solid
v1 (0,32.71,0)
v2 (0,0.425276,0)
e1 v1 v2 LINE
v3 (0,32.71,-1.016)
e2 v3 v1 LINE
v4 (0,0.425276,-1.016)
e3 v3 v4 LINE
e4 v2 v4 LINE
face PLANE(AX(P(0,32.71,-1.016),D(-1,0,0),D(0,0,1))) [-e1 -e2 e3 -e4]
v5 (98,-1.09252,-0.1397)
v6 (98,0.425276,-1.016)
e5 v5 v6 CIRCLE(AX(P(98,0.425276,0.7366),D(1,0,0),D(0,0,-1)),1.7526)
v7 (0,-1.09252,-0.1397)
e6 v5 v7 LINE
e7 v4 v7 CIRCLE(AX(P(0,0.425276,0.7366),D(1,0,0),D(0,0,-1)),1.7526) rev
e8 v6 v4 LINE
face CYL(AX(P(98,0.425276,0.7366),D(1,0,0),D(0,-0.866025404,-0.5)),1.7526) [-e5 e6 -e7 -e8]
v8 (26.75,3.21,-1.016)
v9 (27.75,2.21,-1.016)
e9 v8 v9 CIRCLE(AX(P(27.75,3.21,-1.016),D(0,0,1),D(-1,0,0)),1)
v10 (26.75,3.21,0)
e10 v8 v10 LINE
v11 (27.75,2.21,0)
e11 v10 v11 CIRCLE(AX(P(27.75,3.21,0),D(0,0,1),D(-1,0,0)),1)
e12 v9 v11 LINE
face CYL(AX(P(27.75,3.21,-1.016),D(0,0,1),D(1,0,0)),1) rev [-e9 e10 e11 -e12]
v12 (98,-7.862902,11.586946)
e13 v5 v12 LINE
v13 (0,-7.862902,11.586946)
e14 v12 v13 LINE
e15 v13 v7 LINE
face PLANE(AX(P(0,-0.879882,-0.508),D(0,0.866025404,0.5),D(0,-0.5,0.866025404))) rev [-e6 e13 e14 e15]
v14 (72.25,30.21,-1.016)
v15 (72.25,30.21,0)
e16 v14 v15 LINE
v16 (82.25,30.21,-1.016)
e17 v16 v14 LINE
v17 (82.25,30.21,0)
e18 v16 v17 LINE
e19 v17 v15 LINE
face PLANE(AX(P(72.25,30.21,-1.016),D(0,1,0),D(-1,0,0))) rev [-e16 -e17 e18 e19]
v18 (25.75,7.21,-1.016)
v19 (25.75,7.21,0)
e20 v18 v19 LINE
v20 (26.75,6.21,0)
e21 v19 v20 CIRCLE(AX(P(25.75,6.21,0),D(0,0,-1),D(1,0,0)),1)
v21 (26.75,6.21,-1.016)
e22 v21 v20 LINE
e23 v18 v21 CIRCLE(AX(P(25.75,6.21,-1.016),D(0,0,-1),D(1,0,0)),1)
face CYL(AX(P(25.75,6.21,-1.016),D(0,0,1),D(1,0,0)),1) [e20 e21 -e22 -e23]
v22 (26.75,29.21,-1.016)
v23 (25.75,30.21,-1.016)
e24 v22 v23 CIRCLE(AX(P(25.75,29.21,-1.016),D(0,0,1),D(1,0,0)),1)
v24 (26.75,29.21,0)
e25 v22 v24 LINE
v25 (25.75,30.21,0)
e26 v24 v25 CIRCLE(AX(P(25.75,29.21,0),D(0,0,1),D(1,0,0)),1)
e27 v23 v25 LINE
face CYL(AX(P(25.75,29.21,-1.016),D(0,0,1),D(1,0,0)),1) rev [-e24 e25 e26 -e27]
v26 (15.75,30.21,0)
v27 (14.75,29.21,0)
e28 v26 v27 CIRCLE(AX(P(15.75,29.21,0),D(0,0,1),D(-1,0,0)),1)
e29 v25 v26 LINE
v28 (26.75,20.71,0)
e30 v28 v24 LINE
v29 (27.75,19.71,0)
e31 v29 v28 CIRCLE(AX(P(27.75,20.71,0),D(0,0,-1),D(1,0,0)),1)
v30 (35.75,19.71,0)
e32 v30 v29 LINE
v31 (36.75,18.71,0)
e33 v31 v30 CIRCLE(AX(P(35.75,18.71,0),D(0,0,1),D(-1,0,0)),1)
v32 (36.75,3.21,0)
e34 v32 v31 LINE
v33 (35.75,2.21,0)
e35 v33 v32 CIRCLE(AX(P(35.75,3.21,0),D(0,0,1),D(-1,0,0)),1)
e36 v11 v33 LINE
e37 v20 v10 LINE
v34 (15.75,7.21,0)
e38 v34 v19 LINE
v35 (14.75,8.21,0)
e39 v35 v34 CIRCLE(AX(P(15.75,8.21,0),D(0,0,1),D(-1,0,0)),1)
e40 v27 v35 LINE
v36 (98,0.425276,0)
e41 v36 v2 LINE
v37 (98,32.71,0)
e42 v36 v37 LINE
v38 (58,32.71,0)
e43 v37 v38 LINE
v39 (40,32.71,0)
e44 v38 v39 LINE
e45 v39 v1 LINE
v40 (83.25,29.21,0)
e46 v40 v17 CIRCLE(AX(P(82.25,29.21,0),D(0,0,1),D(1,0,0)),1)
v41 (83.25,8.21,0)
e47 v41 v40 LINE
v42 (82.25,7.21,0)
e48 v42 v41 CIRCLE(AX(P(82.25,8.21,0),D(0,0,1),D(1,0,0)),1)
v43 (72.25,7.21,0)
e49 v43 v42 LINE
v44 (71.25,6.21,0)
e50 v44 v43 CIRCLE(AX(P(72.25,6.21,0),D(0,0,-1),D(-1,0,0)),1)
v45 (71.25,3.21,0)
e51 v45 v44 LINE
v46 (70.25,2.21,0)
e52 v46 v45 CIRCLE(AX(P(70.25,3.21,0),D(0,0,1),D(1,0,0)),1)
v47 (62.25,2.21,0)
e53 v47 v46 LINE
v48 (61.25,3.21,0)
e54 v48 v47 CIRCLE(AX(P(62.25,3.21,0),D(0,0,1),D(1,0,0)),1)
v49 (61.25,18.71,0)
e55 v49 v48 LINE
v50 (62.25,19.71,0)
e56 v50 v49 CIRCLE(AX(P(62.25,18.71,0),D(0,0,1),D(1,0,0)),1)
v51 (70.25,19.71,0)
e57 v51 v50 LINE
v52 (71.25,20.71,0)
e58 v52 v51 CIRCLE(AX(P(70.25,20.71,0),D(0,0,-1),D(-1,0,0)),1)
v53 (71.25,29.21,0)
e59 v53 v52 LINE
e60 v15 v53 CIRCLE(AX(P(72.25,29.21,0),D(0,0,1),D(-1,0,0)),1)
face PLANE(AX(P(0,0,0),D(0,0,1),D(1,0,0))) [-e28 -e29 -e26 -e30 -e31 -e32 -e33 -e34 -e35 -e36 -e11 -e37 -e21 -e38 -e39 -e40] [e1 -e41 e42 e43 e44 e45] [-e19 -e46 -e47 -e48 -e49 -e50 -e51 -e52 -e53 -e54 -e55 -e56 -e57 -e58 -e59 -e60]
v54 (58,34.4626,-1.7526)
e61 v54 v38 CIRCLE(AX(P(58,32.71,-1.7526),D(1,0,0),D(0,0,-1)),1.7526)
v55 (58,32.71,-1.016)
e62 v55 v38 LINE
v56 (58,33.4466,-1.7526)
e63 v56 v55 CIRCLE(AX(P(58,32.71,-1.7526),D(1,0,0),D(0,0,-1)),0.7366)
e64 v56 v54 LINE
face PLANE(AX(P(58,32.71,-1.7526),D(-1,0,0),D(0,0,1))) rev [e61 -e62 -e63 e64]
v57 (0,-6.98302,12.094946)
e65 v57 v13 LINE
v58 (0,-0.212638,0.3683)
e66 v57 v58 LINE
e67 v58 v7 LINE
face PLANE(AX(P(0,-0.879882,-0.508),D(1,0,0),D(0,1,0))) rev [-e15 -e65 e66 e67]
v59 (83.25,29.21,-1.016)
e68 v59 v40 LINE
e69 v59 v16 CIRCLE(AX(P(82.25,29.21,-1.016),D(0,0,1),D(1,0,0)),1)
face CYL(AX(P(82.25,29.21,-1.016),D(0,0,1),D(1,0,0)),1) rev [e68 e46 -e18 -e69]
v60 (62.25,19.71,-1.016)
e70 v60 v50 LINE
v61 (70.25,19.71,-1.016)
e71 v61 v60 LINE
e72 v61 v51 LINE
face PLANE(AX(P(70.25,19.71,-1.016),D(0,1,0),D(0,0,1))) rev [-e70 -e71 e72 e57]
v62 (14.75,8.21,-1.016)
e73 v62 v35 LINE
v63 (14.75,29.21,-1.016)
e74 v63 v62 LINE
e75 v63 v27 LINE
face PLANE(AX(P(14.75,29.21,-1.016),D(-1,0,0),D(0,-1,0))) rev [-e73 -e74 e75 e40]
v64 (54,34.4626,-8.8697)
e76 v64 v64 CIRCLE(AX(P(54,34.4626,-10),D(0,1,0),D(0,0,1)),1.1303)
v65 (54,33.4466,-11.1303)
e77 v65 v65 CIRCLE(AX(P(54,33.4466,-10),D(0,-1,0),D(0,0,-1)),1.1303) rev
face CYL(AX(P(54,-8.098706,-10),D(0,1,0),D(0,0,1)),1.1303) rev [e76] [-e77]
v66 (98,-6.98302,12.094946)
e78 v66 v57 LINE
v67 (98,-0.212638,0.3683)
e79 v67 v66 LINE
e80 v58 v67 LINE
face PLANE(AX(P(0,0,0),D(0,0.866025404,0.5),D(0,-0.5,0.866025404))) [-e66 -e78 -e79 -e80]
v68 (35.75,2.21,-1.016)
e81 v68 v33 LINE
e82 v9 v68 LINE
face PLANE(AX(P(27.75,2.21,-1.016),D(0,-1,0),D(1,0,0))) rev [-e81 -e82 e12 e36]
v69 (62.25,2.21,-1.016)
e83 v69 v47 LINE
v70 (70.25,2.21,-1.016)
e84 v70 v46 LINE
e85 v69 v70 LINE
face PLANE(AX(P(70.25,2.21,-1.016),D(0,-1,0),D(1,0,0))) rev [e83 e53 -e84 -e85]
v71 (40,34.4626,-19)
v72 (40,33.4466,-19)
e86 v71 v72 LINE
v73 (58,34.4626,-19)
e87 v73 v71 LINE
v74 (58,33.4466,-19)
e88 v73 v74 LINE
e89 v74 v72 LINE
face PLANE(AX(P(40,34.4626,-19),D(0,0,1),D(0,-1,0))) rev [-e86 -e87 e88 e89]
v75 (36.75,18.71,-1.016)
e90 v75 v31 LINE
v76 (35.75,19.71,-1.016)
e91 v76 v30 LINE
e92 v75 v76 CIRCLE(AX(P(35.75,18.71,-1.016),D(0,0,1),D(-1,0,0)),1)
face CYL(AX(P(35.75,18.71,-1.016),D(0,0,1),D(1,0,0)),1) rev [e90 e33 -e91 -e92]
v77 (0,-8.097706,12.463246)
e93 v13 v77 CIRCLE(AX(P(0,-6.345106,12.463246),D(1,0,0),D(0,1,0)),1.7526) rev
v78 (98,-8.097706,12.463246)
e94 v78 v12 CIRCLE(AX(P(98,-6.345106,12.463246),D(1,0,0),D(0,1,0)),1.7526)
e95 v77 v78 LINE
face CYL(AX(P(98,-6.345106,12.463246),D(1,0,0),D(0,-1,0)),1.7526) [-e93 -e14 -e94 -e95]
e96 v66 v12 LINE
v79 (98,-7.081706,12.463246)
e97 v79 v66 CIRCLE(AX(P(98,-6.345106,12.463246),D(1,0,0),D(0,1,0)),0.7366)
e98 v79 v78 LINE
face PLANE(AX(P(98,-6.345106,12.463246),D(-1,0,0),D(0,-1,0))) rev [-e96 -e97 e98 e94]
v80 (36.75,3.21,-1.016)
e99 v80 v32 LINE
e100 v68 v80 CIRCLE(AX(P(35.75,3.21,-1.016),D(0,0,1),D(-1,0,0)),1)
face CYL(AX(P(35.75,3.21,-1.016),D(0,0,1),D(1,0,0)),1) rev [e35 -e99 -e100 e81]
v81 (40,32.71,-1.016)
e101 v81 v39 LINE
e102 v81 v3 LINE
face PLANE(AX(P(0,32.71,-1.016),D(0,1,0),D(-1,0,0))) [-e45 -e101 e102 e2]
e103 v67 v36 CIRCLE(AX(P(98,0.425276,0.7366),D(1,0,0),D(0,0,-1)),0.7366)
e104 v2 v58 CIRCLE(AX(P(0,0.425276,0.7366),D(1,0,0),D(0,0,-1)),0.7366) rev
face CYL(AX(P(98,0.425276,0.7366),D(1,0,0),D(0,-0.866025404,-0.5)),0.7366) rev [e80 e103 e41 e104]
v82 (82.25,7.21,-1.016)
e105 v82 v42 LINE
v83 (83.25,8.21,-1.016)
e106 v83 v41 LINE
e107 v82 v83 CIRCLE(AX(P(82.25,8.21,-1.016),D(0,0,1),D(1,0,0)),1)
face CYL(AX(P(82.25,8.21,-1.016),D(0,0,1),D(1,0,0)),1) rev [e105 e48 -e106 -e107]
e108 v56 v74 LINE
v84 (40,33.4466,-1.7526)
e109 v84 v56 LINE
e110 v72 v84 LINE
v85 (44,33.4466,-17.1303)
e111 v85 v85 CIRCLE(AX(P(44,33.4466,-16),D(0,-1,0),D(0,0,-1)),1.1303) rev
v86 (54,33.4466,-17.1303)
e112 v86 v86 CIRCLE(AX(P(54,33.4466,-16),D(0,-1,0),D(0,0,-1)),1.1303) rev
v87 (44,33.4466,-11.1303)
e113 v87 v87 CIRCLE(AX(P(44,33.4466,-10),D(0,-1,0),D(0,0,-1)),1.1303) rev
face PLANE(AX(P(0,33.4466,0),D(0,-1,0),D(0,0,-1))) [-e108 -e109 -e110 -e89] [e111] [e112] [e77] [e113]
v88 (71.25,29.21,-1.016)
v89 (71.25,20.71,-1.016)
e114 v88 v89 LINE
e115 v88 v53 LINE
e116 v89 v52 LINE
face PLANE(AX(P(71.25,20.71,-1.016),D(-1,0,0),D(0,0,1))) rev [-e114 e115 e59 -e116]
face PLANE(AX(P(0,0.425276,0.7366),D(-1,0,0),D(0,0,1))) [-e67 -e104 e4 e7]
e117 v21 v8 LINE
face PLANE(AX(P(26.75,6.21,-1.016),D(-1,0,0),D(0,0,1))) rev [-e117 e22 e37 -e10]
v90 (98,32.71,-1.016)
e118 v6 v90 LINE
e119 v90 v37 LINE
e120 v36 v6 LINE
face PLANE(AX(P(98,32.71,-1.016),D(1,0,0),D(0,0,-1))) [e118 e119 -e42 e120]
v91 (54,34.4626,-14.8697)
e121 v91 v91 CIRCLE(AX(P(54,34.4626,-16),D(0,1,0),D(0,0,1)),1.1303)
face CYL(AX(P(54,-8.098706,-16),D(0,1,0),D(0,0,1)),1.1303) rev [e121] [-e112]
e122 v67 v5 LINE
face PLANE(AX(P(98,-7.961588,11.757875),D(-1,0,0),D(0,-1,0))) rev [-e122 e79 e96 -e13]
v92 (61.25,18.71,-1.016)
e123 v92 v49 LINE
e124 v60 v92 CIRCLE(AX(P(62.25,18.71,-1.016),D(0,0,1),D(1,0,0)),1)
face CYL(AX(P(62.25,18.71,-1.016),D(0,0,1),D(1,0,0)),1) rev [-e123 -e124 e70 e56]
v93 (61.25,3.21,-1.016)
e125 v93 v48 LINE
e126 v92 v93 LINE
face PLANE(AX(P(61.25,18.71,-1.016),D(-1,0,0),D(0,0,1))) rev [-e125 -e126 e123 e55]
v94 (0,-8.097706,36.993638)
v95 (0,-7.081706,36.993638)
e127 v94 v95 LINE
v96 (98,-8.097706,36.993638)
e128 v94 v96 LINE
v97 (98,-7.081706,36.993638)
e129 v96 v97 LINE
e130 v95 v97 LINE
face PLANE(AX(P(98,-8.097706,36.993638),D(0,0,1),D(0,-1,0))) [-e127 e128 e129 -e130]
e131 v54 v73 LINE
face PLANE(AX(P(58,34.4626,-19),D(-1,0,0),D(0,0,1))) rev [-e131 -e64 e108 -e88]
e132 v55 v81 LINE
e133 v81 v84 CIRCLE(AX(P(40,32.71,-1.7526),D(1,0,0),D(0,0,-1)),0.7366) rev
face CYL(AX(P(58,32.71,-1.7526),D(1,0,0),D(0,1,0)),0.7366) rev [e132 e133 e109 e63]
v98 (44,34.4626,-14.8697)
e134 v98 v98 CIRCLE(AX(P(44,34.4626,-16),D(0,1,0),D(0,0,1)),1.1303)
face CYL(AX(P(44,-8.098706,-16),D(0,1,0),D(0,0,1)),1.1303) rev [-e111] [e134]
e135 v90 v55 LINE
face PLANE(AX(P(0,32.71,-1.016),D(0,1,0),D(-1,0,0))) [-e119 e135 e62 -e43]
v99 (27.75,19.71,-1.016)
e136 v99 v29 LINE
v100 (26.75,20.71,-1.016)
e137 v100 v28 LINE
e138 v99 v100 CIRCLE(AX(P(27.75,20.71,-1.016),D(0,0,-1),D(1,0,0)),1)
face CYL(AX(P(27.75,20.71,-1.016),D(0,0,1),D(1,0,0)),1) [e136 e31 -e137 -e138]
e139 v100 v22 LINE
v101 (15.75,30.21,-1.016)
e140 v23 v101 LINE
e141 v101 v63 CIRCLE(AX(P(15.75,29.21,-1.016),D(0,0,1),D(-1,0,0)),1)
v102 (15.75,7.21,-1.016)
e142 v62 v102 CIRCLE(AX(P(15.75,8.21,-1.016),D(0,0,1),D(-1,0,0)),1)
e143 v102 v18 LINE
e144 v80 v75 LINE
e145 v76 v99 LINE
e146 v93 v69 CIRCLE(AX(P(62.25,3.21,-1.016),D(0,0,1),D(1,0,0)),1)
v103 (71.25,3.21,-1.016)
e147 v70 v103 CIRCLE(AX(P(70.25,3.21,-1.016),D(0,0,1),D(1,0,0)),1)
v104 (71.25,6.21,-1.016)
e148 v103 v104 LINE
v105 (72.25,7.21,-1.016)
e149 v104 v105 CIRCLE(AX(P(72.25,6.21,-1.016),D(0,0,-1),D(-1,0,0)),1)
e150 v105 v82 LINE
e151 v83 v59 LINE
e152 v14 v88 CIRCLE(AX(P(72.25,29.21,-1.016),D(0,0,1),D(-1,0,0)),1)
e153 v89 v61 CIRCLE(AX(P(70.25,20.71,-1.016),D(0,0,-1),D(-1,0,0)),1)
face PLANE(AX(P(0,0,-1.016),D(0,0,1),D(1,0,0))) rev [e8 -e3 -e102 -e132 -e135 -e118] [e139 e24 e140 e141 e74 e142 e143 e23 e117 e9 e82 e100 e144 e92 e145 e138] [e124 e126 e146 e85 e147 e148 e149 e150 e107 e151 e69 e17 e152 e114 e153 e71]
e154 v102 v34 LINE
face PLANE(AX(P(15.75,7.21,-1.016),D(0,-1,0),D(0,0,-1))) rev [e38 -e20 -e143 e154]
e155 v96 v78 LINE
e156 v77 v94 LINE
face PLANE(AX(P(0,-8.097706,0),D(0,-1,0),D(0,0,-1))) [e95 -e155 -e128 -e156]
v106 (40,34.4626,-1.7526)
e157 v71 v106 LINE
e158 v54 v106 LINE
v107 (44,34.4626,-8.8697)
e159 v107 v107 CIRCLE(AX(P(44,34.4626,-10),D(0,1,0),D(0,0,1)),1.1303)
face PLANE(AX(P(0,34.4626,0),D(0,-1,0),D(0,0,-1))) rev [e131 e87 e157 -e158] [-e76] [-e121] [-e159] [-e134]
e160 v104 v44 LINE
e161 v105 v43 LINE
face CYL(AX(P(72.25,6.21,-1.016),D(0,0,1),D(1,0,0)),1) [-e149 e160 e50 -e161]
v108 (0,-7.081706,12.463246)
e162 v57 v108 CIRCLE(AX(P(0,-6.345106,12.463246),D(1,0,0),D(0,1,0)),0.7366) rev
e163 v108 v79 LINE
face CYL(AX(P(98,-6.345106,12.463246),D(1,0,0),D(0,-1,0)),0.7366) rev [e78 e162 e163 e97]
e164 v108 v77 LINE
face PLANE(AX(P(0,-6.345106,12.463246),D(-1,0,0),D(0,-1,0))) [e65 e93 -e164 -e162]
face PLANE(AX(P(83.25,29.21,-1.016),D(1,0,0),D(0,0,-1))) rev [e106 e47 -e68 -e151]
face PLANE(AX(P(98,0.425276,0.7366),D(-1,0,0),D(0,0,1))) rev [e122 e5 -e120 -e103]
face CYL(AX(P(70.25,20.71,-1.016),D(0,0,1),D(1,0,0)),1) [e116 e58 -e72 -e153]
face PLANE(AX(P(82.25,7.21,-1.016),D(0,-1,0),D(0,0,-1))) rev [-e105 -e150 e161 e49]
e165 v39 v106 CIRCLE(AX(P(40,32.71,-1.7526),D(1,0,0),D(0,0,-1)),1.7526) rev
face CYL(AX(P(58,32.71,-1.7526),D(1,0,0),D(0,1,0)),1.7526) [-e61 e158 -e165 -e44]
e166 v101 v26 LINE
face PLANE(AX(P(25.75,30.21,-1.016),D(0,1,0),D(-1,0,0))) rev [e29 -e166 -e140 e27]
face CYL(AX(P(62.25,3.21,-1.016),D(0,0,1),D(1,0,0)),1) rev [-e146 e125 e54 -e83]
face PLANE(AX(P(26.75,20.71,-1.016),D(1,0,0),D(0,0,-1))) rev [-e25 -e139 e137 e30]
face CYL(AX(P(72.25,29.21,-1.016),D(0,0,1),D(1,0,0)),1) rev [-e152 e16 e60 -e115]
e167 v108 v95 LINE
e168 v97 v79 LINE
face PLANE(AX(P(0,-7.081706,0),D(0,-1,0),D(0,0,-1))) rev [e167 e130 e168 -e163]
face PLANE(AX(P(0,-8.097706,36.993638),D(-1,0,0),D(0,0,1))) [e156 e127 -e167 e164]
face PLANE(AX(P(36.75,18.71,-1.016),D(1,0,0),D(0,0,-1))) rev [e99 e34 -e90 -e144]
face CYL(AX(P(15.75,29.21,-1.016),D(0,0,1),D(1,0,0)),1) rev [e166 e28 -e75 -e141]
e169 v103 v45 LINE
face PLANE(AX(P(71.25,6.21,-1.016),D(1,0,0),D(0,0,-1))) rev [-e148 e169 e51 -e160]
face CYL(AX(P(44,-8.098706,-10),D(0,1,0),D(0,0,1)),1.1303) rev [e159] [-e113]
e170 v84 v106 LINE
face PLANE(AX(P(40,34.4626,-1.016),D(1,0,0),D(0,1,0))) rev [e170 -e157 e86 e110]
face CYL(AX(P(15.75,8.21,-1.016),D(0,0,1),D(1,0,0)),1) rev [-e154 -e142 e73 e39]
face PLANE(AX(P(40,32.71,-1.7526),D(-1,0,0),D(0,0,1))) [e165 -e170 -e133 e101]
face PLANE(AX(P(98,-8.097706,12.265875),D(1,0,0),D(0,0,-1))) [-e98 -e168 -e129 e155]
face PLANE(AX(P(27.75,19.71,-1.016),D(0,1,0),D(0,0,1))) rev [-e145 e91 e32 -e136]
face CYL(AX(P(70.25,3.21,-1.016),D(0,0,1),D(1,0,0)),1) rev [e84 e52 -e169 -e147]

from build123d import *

# Parameters (mm, degrees)
SKETCH1_W                    = 98
SKETCH1_H                    = 32.71
BASE_FLANGE1_DEPTH           = 1.016
EDGE_FLANGE1_DEPTH           = 18
EDGE_FLANGE2_STRIP_CUT_DEPTH = 98
EDGE_FLANGE2_DEPTH           = 98
EDGE_FLANGE3_STRIP_CUT_DEPTH = 98
EDGE_FLANGE3_DEPTH           = 98
CUT_EXTRUDE1_REACH           = 115.066
SKETCH17_R                   = 1.1303


# Sheet-metal steps are written as plain solids
with BuildPart() as part:
    # Sketch1 → Base-Flange1 (new body)
    with BuildSketch(Plane.XY):
        with Locations((49, 16.355)):
            Rectangle(SKETCH1_W, SKETCH1_H)
        with BuildLine():
            Line((61.25, 18.71), (61.25, 3.21))
            ThreePointArc((61.25, 3.21), (61.542893219, 2.502893219), (62.25, 2.21))
            Line((62.25, 2.21), (70.25, 2.21))
            ThreePointArc((70.25, 2.21), (70.957106781, 2.502893219), (71.25, 3.21))
            Line((71.25, 3.21), (71.25, 6.21))
            ThreePointArc((71.25, 6.21), (71.542893219, 6.917106781), (72.25, 7.21))
            Line((72.25, 7.21), (82.25, 7.21))
            ThreePointArc((82.25, 7.21), (82.957106781, 7.502893219), (83.25, 8.21))
            Line((83.25, 8.21), (83.25, 29.21))
            ThreePointArc((83.25, 29.21), (82.957106781, 29.917106781), (82.25, 30.21))
            Line((82.25, 30.21), (72.25, 30.21))
            ThreePointArc((72.25, 30.21), (71.542893219, 29.917106781), (71.25, 29.21))
            Line((71.25, 29.21), (71.25, 20.71))
            ThreePointArc((71.25, 20.71), (70.957106781, 20.002893219), (70.25, 19.71))
            Line((70.25, 19.71), (62.25, 19.71))
            ThreePointArc((62.25, 19.71), (61.542893219, 19.417106781), (61.25, 18.71))
        make_face(mode=Mode.SUBTRACT)
        with BuildLine():
            Line((25.75, 30.21), (15.75, 30.21))
            ThreePointArc((15.75, 30.21), (15.042893219, 29.917106781), (14.75, 29.21))
            Line((14.75, 29.21), (14.75, 8.21))
            ThreePointArc((14.75, 8.21), (15.042893219, 7.502893219), (15.75, 7.21))
            Line((15.75, 7.21), (25.75, 7.21))
            ThreePointArc((25.75, 7.21), (26.457106781, 6.917106781), (26.75, 6.21))
            Line((26.75, 6.21), (26.75, 3.21))
            ThreePointArc((26.75, 3.21), (27.042893219, 2.502893219), (27.75, 2.21))
            Line((27.75, 2.21), (35.75, 2.21))
            ThreePointArc((35.75, 2.21), (36.457106781, 2.502893219), (36.75, 3.21))
            Line((36.75, 3.21), (36.75, 18.71))
            ThreePointArc((36.75, 18.71), (36.457106781, 19.417106781), (35.75, 19.71))
            Line((35.75, 19.71), (27.75, 19.71))
            ThreePointArc((27.75, 19.71), (27.042893219, 20.002893219), (26.75, 20.71))
            Line((26.75, 20.71), (26.75, 29.21))
            ThreePointArc((26.75, 29.21), (26.457106781, 29.917106781), (25.75, 30.21))
        make_face(mode=Mode.SUBTRACT)
    extrude(amount=-BASE_FLANGE1_DEPTH)

    # Edge-Flange1 section (across the edge) → Edge-Flange1 (add)
    with BuildSketch(Plane(origin=(40, 33.4466, -1.016), x_dir=(0, -1, 0), z_dir=(1, 0, 0))):
        with BuildLine():
            Line((-1.016, 0.7366), (-1.016, 17.984))
            Line((-1.016, 17.984), (0, 17.984))
            Line((0, 17.984), (0, 0.7366))
            ThreePointArc((0, 0.7366), (0.215745145, 0.215745145), (0.7366, 0))
            Line((0.7366, 0), (0.7366, -1.016))
            ThreePointArc((0.7366, -1.016), (-0.502675345, -0.502675345), (-1.016, 0.7366))
        make_face()
    extrude(amount=EDGE_FLANGE1_DEPTH)

    # Edge-Flange2 strip (across the edge) → Edge-Flange2 strip cut (cut)
    with BuildSketch(Plane(origin=(0, 0, 0), x_dir=(0, 0.8660254037844364, 0.5000000000000041), z_dir=(1, 0, 0))):
        Polygon((-4.935055866, 1.676080086), (-0.1397, -1.092519914), (0.3683, -0.212638104), (-4.427055866, 2.555961896), align=None)
    extrude(amount=EDGE_FLANGE2_STRIP_CUT_DEPTH, mode=Mode.SUBTRACT)

    # Edge-Flange2 section (across the edge) → Edge-Flange2 (add)
    with BuildSketch(Plane(origin=(0, 0, 0), x_dir=(0, 0.8660254037844364, 0.5000000000000041), z_dir=(1, 0, 0))):
        with BuildLine():
            Line((-1.016, 0.425276208), (-1.016, 14.163412127))
            Line((-1.016, 14.163412127), (0, 14.163412127))
            Line((0, 14.163412127), (0, 0.425276208))
            ThreePointArc((0, 0.425276208), (0.098685688, 0.056976208), (0.3683, -0.212638104))
            Line((0.3683, -0.212638104), (-0.1397, -1.092519914))
            ThreePointArc((-0.1397, -1.092519914), (-0.781196123, -0.451023792), (-1.016, 0.425276208))
        make_face()
    extrude(amount=EDGE_FLANGE2_DEPTH)

    # Edge-Flange3 strip (across the edge) → Edge-Flange3 strip cut (cut)
    with BuildSketch(Plane(origin=(0, -7.081706063, 12.265874706), x_dir=(0, 1, 0), z_dir=(1, 0, 0))):
        Polygon((-3.549796123, 4.116427241), (-0.781196123, -0.678928625), (0.098685688, -0.170928625), (-2.669914312, 4.624427241), align=None)
    extrude(amount=EDGE_FLANGE3_STRIP_CUT_DEPTH, mode=Mode.SUBTRACT)

    # Edge-Flange3 section (across the edge) → Edge-Flange3 (add)
    with BuildSketch(Plane(origin=(0, -7.081706063, 12.265874706), x_dir=(0, 1, 0), z_dir=(1, 0, 0))):
        with BuildLine():
            Line((-1.016, 0.197371375), (-1.016, 24.72776362))
            Line((-1.016, 24.72776362), (0, 24.72776362))
            Line((0, 24.72776362), (0, 0.197371375))
            ThreePointArc((0, 0.197371375), (0.025099036, 0.006725267), (0.098685688, -0.170928625))
            Line((0.098685688, -0.170928625), (-0.781196123, -0.678928625))
            ThreePointArc((-0.781196123, -0.678928625), (-0.956281603, -0.256234883), (-1.016, 0.197371375))
        make_face()
    extrude(amount=EDGE_FLANGE3_DEPTH)

    # Sketch17 → Cut-Extrude1 (cut, up to next)
    with BuildSketch(Plane(origin=(0, 34.4626, 0), x_dir=(1, 0, 0), z_dir=(0, 1, 0)), mode=Mode.PRIVATE) as cut_extrude1_sk1:
        with Locations(Location((54, 10, 0), (0, 0, 270))):
            Circle(SKETCH17_R)
    cut_extrude1_tool1 = extrude(cut_extrude1_sk1.sketch, amount=-CUT_EXTRUDE1_REACH, mode=Mode.PRIVATE) & part.part
    # Sketch17 → Cut-Extrude1 (cut, up to next)
    with BuildSketch(Plane(origin=(0, 34.4626, 0), x_dir=(1, 0, 0), z_dir=(0, 1, 0)), mode=Mode.PRIVATE) as cut_extrude1_sk2:
        with Locations(Location((54, 16, 0), (0, 0, 270))):
            Circle(SKETCH17_R)
    cut_extrude1_tool2 = extrude(cut_extrude1_sk2.sketch, amount=-CUT_EXTRUDE1_REACH, mode=Mode.PRIVATE) & part.part
    # Sketch17 → Cut-Extrude1 (cut, up to next)
    with BuildSketch(Plane(origin=(0, 34.4626, 0), x_dir=(1, 0, 0), z_dir=(0, 1, 0)), mode=Mode.PRIVATE) as cut_extrude1_sk3:
        with Locations(Location((44, 10, 0), (0, 0, 270))):
            Circle(SKETCH17_R)
    cut_extrude1_tool3 = extrude(cut_extrude1_sk3.sketch, amount=-CUT_EXTRUDE1_REACH, mode=Mode.PRIVATE) & part.part
    # Sketch17 → Cut-Extrude1 (cut, up to next)
    with BuildSketch(Plane(origin=(0, 34.4626, 0), x_dir=(1, 0, 0), z_dir=(0, 1, 0)), mode=Mode.PRIVATE) as cut_extrude1_sk4:
        with Locations(Location((44, 16, 0), (0, 0, 270))):
            Circle(SKETCH17_R)
    cut_extrude1_tool4 = extrude(cut_extrude1_sk4.sketch, amount=-CUT_EXTRUDE1_REACH, mode=Mode.PRIVATE) & part.part
    add(cut_extrude1_tool1.solids().sort_by_distance((54, 34.4626, -10))[0], mode=Mode.SUBTRACT)
    add(cut_extrude1_tool2.solids().sort_by_distance((54, 34.4626, -16))[0], mode=Mode.SUBTRACT)
    add(cut_extrude1_tool3.solids().sort_by_distance((44, 34.4626, -10))[0], mode=Mode.SUBTRACT)
    add(cut_extrude1_tool4.solids().sort_by_distance((44, 34.4626, -16))[0], mode=Mode.SUBTRACT)


solid = part.part
